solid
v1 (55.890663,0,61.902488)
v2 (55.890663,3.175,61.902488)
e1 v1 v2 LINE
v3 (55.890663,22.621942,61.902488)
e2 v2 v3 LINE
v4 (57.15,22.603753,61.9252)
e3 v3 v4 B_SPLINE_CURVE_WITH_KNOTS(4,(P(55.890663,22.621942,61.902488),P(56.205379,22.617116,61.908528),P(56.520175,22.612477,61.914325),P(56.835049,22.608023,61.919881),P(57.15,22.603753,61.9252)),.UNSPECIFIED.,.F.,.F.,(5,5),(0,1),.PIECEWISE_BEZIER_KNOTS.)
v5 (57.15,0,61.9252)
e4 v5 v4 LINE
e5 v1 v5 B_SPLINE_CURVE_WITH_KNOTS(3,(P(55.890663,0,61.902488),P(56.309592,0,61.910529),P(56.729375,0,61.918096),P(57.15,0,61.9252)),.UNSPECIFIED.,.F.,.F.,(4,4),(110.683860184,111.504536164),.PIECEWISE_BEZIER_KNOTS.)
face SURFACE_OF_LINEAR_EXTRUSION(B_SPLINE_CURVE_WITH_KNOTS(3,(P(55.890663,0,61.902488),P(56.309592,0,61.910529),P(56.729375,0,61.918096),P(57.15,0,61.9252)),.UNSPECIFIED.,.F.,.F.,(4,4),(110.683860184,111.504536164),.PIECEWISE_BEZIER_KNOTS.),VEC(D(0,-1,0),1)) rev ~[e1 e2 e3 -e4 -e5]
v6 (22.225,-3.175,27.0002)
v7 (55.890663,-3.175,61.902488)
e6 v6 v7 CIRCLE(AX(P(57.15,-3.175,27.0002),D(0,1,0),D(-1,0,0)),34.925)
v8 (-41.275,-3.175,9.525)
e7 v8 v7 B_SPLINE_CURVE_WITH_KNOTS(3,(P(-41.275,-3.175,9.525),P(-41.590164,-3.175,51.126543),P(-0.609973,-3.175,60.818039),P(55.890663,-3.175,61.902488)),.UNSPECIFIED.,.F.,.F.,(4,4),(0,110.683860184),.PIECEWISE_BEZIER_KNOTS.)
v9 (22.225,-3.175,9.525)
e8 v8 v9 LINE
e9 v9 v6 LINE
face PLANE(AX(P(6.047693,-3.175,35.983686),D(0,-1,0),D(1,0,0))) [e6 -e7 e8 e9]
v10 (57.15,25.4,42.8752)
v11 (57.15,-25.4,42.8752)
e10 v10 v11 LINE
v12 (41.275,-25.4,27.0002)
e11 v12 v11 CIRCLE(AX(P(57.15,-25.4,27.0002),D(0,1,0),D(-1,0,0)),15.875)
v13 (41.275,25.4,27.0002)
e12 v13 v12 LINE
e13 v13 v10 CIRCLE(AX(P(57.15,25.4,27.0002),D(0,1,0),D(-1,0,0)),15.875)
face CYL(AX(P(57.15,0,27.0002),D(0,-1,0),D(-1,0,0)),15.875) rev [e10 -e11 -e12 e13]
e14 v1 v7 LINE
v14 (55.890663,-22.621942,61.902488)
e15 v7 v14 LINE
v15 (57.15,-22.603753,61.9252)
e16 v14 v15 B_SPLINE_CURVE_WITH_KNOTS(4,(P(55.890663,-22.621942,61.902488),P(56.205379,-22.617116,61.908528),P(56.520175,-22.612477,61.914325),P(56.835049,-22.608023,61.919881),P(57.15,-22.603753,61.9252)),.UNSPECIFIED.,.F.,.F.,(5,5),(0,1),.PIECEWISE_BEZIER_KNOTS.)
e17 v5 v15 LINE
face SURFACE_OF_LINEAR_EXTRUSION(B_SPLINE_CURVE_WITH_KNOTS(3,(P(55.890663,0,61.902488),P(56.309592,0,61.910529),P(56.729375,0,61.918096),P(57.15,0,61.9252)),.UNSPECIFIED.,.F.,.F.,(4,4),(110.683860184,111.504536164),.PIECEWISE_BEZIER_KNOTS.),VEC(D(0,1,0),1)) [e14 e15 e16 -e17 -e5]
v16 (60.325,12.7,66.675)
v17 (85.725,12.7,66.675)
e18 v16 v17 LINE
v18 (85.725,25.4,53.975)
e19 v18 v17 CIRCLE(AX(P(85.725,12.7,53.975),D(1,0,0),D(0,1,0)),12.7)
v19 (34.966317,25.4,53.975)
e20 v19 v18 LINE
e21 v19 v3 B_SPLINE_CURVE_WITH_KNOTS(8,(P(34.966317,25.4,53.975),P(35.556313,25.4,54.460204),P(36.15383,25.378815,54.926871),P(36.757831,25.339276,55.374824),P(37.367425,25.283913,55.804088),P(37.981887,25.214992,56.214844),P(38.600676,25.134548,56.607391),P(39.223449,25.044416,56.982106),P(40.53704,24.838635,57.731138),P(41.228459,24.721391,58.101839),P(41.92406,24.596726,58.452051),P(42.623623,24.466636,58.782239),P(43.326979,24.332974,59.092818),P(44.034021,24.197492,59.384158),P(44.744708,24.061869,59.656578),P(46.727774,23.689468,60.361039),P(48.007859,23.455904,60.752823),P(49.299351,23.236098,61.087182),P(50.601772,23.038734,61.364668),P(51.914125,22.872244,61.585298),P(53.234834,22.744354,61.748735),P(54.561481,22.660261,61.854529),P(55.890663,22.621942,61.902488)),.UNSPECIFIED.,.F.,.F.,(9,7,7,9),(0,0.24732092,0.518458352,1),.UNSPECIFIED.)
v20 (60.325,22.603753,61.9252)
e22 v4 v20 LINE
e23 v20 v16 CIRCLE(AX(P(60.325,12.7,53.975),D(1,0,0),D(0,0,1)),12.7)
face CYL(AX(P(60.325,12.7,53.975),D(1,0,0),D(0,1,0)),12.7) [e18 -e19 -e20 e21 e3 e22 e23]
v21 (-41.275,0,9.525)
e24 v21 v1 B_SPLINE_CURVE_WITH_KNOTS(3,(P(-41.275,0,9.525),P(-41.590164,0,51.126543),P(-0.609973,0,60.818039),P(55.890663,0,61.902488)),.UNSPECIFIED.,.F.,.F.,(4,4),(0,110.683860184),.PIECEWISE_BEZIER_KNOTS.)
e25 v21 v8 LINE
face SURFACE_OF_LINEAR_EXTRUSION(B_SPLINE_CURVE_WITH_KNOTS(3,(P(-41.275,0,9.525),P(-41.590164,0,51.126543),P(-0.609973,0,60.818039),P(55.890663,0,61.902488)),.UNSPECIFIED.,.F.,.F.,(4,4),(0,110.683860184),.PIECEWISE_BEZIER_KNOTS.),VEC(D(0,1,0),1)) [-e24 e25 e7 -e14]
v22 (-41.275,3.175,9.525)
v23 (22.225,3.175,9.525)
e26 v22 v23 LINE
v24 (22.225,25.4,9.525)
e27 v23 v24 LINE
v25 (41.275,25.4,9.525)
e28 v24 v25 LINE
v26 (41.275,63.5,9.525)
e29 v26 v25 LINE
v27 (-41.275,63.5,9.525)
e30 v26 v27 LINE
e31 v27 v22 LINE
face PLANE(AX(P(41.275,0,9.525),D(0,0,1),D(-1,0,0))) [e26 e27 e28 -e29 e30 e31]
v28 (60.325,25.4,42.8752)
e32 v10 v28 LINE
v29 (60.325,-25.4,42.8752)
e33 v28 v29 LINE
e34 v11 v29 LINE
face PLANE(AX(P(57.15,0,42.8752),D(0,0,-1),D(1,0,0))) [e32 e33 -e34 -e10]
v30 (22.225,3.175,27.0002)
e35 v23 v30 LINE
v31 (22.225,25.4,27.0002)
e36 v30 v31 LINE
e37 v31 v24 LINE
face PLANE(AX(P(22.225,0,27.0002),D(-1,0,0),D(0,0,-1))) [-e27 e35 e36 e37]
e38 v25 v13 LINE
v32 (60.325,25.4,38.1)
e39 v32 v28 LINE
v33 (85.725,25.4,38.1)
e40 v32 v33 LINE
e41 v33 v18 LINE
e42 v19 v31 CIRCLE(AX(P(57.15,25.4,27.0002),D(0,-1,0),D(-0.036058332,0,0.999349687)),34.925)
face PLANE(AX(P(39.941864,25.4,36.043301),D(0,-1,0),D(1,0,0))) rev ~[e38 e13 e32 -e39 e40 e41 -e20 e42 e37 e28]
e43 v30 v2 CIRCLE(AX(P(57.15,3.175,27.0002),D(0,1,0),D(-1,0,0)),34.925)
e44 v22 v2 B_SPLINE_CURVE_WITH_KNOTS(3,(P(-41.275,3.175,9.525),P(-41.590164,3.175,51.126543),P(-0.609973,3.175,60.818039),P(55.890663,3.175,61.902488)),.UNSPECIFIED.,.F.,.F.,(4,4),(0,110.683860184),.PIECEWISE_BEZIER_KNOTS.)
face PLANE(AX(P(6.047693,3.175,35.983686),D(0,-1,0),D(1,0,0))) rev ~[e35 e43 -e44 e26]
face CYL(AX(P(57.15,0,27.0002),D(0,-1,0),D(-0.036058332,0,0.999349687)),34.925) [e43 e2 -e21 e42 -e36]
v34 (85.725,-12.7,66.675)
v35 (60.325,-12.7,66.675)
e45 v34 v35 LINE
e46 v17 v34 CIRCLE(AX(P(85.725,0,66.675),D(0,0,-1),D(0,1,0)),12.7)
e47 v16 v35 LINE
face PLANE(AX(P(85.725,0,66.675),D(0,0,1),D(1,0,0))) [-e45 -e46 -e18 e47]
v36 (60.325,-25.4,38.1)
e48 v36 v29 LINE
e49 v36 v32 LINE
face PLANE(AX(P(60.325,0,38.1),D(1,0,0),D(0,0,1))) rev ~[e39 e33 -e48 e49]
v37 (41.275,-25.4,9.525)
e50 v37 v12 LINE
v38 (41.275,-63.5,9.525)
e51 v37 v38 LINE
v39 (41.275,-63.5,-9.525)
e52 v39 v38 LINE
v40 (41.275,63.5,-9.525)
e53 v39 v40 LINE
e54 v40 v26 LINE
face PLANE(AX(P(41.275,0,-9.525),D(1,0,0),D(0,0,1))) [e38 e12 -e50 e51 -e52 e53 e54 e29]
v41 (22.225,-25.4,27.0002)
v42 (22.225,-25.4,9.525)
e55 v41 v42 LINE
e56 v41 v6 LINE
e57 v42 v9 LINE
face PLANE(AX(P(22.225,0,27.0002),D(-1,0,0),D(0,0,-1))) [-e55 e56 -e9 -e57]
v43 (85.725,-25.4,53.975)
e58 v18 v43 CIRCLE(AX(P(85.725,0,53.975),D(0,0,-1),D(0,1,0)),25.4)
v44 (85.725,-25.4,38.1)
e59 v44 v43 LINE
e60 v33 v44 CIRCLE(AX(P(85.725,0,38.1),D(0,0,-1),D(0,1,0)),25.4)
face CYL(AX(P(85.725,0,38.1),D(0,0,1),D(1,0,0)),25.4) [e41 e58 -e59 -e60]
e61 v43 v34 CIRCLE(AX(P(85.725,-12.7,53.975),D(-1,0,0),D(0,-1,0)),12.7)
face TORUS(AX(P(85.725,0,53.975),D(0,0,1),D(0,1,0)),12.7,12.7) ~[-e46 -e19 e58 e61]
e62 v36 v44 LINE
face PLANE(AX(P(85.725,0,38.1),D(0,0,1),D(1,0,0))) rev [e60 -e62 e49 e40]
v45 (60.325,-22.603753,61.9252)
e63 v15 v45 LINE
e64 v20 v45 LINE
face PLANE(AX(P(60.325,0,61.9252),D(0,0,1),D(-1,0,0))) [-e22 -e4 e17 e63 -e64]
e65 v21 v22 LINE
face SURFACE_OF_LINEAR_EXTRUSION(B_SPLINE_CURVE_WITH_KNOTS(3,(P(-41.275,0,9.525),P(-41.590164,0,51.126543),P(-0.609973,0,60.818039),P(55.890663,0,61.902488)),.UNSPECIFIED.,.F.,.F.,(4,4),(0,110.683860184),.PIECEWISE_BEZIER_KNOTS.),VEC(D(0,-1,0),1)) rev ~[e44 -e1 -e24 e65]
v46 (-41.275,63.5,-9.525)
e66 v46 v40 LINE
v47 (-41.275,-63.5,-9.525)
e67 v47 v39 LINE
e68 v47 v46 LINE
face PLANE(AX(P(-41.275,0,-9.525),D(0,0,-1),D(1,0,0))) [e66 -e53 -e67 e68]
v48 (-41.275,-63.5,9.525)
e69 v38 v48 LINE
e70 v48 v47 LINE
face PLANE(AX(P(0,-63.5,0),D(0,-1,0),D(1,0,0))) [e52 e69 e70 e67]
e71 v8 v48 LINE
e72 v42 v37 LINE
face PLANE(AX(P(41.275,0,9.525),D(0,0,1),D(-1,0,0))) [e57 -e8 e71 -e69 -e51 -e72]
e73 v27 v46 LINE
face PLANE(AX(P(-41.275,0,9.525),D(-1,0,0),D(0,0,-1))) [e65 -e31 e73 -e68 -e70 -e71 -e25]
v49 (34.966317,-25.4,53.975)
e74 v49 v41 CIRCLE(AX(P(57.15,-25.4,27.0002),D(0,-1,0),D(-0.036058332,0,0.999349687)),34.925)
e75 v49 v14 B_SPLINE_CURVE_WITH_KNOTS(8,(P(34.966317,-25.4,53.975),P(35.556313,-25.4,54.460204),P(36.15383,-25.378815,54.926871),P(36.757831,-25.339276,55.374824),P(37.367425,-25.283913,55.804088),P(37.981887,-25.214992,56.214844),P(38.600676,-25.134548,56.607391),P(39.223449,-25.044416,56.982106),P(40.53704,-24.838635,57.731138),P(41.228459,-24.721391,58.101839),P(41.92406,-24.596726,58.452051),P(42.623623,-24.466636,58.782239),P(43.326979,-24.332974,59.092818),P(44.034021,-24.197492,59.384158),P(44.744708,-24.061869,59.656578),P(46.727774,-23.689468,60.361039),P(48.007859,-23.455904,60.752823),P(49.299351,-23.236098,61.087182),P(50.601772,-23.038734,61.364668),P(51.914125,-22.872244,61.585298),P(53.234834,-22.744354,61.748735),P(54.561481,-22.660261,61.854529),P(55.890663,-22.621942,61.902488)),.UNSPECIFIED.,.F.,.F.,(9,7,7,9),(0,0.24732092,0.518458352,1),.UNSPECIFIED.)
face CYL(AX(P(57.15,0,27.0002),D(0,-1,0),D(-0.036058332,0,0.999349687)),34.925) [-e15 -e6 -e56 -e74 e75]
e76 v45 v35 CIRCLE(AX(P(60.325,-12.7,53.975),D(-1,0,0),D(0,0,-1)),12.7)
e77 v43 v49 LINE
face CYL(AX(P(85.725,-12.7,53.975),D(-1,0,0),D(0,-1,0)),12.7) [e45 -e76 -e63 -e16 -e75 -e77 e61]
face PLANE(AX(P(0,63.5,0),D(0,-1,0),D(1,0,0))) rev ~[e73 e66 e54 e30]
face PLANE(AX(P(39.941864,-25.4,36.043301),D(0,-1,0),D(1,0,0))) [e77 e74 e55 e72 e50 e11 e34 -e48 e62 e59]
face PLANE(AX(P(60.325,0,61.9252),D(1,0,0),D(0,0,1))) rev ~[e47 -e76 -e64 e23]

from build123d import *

# Parameters (mm, degrees)
F1_DEPTH = 63.5
F0_W     = 25.4
F0_H     = 19.05
F0_H_2   = 4.7498
F0_H_3   = 4.7752
F2_DEPTH = 25.4
F4_DEPTH = 3.175
F5_R     = 12.7


with BuildPart() as f1:
    # F0 (on Front) → F1 (new body, symmetric)
    with BuildSketch(Plane.XZ):
        Polygon((41.275, -9.525), (41.275, 9.525), (22.225, 9.525), (-41.275, 9.525), (-41.275, -9.525), align=None)
    extrude(amount=F1_DEPTH, both=True)

    # F0 (on Front) → F2 (join, symmetric)
    with BuildSketch(Plane.XZ):
        with BuildLine():
            Line((22.225, 9.525), (41.275, 9.525))
            Line((41.275, 9.525), (41.275, 27.0002))
            ThreePointArc((41.275, 27.0002), (45.9246798487, 38.2255201513), (57.15, 42.8752))
            Line((57.15, 42.8752), (60.325, 42.8752))
            Line((60.325, 42.8752), (60.325, 61.9252))
            Line((60.325, 61.9252), (57.15, 61.9252))
            add(Edge.make_bspline(
                [(55.8906627655, 61.9024878151), (56.3095920905, 61.9105285601), (56.7293746708, 61.9180961221), (57.15, 61.9252)],
                knots=[110.683860184, 110.683860184, 110.683860184, 110.683860184, 111.5045361635, 111.5045361635, 111.5045361635, 111.5045361635], degree=3))
            ThreePointArc((55.8906627655, 61.9024878151), (32.0129956248, 51.2465736679), (22.225, 27.0002))
            Line((22.225, 27.0002), (22.225, 9.525))
        make_face()
        with Locations((73.025, 52.4002)):
            Rectangle(F0_W, F0_H)
        with Locations((73.025, 64.3001)):
            Rectangle(F0_W, F0_H_2)
        with Locations((73.025, 40.4876)):
            Rectangle(F0_W, F0_H_3)
    extrude(amount=F2_DEPTH, both=True)

    # F0 (on Front) → F3 (revolve)
    with BuildSketch(Plane.XZ):
        Polygon((85.725, 61.9252), (85.725, 42.8752), (85.725, 38.1), (111.125, 38.1), (111.125, 66.675), (85.725, 66.675), align=None)
    revolve(axis=Axis((85.725, 0, 52.3875), (0, 0, 1)))

    # F0 (on Front) → F4 (join, symmetric)
    with BuildSketch(Plane.XZ):
        with BuildLine():
            Line((-41.275, 9.525), (22.225, 9.525))
            Line((22.225, 9.525), (22.225, 27.0002))
            ThreePointArc((22.225, 27.0002), (32.0129956248, 51.2465736679), (55.8906627655, 61.9024878151))
            add(Edge.make_bspline(
                [(-41.275, 9.525), (-41.5901642884, 51.126542611), (-0.6099732885, 60.8180394914), (55.8906627655, 61.9024878151)],
                knots=[0, 0, 0, 0, 110.683860184, 110.683860184, 110.683860184, 110.683860184], degree=3))
        make_face()
    extrude(amount=F4_DEPTH, both=True)

    # F5
    f5_edges = [f1.edges().sort_by_distance(p)[0] for p in [
        (85.725, 25.4, 52.3875),
        (73.025, 25.4, 66.675),
        (73.025, -25.4, 66.675),
        (111.125, 0, 66.675),
    ]]
    fillet(f5_edges, radius=F5_R)


solid = f1.part
